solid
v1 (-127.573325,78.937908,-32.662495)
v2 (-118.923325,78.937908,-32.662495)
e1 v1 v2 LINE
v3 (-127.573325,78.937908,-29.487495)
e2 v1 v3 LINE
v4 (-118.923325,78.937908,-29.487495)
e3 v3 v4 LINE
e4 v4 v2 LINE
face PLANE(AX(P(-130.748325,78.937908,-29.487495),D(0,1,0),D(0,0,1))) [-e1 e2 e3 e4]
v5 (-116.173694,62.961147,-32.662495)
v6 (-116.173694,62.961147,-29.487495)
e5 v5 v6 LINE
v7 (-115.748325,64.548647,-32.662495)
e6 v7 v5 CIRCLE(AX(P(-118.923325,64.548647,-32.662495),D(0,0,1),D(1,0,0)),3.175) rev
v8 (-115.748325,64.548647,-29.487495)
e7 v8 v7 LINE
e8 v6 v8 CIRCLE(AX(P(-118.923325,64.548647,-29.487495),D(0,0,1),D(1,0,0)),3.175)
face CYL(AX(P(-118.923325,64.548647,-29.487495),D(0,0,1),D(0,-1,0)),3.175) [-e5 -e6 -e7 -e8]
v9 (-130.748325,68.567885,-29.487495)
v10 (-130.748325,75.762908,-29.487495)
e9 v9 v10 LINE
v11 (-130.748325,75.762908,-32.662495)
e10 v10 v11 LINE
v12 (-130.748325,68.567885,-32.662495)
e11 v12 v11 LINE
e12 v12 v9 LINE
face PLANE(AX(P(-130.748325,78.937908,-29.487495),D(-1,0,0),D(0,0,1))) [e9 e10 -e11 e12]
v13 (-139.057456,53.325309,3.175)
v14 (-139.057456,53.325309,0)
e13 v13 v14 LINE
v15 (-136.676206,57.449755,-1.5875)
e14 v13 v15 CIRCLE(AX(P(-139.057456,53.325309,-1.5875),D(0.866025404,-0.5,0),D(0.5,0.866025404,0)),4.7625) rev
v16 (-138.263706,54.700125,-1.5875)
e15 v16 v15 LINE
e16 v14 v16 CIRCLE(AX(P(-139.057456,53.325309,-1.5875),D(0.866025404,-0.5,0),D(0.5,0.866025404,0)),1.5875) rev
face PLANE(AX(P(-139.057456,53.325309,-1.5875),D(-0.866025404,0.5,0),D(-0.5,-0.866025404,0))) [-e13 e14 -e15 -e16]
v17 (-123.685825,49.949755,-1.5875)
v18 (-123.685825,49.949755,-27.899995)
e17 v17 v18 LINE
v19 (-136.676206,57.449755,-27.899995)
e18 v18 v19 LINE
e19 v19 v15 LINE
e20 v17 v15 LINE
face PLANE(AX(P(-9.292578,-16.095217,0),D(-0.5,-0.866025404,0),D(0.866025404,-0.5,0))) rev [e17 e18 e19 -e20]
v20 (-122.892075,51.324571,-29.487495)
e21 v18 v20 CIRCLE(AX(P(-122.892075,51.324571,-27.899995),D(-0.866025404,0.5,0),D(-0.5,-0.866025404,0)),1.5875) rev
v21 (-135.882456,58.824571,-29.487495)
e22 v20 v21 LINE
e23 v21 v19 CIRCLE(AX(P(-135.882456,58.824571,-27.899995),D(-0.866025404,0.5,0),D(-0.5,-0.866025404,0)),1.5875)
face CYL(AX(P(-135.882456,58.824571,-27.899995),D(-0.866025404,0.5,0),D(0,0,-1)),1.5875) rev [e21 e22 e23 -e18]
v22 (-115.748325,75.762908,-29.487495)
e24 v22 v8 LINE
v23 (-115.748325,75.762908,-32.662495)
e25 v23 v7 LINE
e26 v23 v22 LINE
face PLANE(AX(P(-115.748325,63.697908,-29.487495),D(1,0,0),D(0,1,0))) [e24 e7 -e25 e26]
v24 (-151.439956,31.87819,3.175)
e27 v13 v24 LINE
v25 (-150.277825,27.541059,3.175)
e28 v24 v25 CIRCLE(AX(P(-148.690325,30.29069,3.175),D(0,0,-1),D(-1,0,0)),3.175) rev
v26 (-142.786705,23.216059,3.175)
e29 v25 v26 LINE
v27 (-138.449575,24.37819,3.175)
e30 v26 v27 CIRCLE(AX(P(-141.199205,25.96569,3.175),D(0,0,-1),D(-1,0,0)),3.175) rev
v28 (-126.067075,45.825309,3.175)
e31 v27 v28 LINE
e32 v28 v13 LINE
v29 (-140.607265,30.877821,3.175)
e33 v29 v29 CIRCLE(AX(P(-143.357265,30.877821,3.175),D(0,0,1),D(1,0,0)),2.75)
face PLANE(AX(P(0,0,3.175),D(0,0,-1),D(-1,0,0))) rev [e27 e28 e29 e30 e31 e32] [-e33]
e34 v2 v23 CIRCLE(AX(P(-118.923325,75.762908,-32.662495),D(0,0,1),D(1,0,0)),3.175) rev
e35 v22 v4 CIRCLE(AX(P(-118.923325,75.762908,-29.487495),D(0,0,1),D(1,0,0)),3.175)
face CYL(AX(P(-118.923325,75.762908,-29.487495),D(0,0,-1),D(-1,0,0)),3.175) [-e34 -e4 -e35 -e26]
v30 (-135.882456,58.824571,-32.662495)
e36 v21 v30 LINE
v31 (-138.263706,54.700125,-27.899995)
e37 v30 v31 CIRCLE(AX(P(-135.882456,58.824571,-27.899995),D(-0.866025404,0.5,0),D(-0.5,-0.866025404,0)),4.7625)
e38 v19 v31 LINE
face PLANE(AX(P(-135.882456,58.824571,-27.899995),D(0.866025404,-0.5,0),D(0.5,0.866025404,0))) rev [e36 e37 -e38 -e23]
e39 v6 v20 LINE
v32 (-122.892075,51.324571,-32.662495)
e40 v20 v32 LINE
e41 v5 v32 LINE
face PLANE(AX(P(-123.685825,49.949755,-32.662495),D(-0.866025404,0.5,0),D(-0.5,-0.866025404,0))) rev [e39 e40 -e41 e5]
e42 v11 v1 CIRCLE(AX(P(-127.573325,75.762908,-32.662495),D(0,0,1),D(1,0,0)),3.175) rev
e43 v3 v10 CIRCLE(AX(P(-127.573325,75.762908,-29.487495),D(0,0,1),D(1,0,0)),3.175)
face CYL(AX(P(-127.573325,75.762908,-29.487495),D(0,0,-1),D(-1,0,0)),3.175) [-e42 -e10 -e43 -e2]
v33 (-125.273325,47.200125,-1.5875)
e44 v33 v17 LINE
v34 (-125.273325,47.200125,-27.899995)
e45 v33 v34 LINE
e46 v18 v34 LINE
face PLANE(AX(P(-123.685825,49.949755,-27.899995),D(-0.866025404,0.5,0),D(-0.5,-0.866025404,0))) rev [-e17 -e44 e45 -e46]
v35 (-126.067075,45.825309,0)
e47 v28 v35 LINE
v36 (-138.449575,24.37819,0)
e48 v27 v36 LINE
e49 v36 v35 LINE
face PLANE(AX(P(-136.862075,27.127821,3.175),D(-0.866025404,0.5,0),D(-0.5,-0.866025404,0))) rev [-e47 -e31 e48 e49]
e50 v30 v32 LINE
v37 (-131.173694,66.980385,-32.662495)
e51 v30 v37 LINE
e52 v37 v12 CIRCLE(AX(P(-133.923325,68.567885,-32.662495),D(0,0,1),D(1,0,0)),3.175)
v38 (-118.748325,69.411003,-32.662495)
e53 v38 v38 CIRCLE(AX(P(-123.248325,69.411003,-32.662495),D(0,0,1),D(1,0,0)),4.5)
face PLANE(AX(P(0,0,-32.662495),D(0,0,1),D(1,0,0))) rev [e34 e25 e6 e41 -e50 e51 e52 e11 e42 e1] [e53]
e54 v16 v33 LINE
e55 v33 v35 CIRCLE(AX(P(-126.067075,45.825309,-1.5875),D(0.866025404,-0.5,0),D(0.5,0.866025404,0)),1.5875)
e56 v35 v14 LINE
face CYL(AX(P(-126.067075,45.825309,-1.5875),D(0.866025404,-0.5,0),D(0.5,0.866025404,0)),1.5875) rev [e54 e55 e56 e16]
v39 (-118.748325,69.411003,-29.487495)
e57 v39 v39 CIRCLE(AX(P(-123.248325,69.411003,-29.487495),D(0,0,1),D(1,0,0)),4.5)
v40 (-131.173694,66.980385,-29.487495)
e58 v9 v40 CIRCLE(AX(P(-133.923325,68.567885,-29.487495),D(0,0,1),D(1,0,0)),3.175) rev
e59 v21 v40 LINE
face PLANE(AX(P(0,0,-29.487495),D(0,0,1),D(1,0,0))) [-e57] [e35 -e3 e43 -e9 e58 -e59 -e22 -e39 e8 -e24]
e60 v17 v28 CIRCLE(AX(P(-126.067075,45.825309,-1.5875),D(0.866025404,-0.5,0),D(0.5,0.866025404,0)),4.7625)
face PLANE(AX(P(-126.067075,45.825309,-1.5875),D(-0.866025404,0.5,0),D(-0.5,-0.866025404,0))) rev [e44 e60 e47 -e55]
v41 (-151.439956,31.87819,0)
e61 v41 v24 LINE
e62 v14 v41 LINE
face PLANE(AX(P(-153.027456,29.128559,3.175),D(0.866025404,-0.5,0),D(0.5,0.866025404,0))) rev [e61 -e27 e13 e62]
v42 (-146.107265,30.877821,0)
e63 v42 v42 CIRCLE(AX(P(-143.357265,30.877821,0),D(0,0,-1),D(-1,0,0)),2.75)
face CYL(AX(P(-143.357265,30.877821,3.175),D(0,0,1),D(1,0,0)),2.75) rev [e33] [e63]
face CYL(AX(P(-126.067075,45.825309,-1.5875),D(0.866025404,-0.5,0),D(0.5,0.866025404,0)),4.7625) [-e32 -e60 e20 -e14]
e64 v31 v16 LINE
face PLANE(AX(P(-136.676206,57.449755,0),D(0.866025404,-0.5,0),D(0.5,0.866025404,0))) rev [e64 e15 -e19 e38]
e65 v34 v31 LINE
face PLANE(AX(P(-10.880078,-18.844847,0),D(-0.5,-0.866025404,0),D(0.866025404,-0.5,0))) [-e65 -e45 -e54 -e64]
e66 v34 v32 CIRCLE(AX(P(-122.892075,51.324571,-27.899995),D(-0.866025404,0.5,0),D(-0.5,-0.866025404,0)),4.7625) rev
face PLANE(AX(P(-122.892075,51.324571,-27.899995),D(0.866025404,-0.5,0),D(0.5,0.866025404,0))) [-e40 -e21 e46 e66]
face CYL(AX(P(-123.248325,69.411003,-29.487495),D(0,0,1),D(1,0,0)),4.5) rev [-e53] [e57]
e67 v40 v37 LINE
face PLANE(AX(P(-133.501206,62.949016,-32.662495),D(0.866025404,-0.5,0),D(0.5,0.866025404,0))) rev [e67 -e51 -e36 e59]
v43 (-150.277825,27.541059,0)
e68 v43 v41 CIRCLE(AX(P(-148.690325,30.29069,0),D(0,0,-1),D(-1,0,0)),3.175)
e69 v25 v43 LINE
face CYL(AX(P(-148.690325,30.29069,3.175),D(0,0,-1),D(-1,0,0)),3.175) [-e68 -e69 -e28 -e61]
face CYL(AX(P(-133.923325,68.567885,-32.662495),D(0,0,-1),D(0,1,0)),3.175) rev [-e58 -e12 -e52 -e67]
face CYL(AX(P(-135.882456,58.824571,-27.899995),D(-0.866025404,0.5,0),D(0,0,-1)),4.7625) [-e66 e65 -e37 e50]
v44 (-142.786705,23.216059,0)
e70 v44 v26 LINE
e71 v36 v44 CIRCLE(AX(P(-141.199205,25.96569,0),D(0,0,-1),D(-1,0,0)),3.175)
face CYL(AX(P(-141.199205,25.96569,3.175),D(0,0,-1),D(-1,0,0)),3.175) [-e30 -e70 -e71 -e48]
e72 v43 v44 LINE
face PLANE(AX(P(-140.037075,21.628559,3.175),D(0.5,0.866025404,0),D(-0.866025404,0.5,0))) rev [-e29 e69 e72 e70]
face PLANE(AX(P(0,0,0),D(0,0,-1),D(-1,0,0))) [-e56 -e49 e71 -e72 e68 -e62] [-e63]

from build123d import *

# Parameters (mm, degrees)
BASE_FLANGE1_DEPTH   = 3.175
EDGE_FLANGE1_DEPTH   = 15
EDGE_FLANGE2_DEPTH   = 15
BOSS_EXTRUDE1_DEPTH  = 3.175
M5_CLEARANCE_HOLE1_D = 5.5
FILLET1_R            = 3.175
M8_CLEARANCE_HOLE1_D = 9


# Sheet-metal steps are written as plain solids
with BuildPart() as part:
    # Sketch2 → Base-Flange1 (new body)
    with BuildSketch(Plane.XY):
        Polygon((-136.862074611, 27.127820722), (-140.037074611, 21.628559408), (-153.027455668, 29.128559408), (-149.852455668, 34.627820722), (-139.057455668, 53.32530919), (-126.067074611, 45.82530919), align=None)
    extrude(amount=BASE_FLANGE1_DEPTH)

    # Edge-Flange1 section (across the edge) → Edge-Flange1 (add)
    with BuildSketch(Plane(origin=(-138.263705668, 54.700124518, 0), x_dir=(-0.49999999999999706, -0.8660254037844405, -3.491481338843133e-15), z_dir=(0.8660254037844405, -0.49999999999999706, 0))):
        with BuildLine():
            Line((-3.175, 1.5875), (-3.175, 27.899995))
            Line((-3.175, 27.899995), (0, 27.899995))
            Line((0, 27.899995), (0, 1.5875))
            ThreePointArc((0, 1.5875), (0.464967985, 0.464967985), (1.5875, 0))
            Line((1.5875, 0), (1.5875, -3.175))
            ThreePointArc((1.5875, -3.175), (-1.780096045, -1.780096045), (-3.175, 1.5875))
        make_face()
    extrude(amount=EDGE_FLANGE1_DEPTH)

    # Edge-Flange2 section (across the edge) → Edge-Flange2 (add)
    with BuildSketch(Plane(origin=(-123.685824611, 49.949755175, -29.487495), x_dir=(0, 0, 1), z_dir=(-0.8660254037844397, 0.4999999999999983, 0))):
        with BuildLine():
            Line((-3.175, 1.5875), (-3.175, 6.35))
            Line((-3.175, 6.35), (0, 6.35))
            Line((0, 6.35), (0, 1.5875))
            ThreePointArc((0, 1.5875), (0.464967985, 0.464967985), (1.5875, 0))
            Line((1.5875, 0), (1.5875, -3.175))
            ThreePointArc((1.5875, -3.175), (-1.780096045, -1.780096045), (-3.175, 1.5875))
        make_face()
    extrude(amount=EDGE_FLANGE2_DEPTH)

    # Sketch15 → Boss-Extrude1 (add)
    with BuildSketch(Plane(origin=(0, 0, -32.662495), x_dir=(-1, 0, 0), z_dir=(0, 0, -1))):
        Polygon((133.501205668, 62.949016489), (120.510824611, 55.449016489), (115.748324611, 63.69790846), (115.748324611, 78.93790846), (130.748324611, 78.93790846), (130.748324611, 67.717146347), align=None)
    extrude(amount=-BOSS_EXTRUDE1_DEPTH)

    # M5 Clearance Hole1 (through all)
    with Locations(Plane.XY.offset(3.175)):
        with Locations((-143.35726514, 30.877820722)):
            Hole(M5_CLEARANCE_HOLE1_D / 2)

    # Fillet1
    fillet1_edges = [part.edges().sort_by_distance(p)[0] for p in [
        (-140.037074611, 21.628559408, 1.5875),
        (-153.027455668, 29.128559408, 1.5875),
        (-130.748324611, 67.717146347, -31.074995),
        (-115.748324611, 63.69790846, -31.074995),
        (-115.748324611, 78.93790846, -31.074995),
        (-130.748324611, 78.93790846, -31.074995),
    ]]
    fillet(fillet1_edges, radius=FILLET1_R)

    # M8 Clearance Hole1 (through all)
    with Locations(Plane.XY.offset(-29.487495)):
        with Locations((-123.248324611, 69.41100346)):
            Hole(M8_CLEARANCE_HOLE1_D / 2)


solid = part.part
